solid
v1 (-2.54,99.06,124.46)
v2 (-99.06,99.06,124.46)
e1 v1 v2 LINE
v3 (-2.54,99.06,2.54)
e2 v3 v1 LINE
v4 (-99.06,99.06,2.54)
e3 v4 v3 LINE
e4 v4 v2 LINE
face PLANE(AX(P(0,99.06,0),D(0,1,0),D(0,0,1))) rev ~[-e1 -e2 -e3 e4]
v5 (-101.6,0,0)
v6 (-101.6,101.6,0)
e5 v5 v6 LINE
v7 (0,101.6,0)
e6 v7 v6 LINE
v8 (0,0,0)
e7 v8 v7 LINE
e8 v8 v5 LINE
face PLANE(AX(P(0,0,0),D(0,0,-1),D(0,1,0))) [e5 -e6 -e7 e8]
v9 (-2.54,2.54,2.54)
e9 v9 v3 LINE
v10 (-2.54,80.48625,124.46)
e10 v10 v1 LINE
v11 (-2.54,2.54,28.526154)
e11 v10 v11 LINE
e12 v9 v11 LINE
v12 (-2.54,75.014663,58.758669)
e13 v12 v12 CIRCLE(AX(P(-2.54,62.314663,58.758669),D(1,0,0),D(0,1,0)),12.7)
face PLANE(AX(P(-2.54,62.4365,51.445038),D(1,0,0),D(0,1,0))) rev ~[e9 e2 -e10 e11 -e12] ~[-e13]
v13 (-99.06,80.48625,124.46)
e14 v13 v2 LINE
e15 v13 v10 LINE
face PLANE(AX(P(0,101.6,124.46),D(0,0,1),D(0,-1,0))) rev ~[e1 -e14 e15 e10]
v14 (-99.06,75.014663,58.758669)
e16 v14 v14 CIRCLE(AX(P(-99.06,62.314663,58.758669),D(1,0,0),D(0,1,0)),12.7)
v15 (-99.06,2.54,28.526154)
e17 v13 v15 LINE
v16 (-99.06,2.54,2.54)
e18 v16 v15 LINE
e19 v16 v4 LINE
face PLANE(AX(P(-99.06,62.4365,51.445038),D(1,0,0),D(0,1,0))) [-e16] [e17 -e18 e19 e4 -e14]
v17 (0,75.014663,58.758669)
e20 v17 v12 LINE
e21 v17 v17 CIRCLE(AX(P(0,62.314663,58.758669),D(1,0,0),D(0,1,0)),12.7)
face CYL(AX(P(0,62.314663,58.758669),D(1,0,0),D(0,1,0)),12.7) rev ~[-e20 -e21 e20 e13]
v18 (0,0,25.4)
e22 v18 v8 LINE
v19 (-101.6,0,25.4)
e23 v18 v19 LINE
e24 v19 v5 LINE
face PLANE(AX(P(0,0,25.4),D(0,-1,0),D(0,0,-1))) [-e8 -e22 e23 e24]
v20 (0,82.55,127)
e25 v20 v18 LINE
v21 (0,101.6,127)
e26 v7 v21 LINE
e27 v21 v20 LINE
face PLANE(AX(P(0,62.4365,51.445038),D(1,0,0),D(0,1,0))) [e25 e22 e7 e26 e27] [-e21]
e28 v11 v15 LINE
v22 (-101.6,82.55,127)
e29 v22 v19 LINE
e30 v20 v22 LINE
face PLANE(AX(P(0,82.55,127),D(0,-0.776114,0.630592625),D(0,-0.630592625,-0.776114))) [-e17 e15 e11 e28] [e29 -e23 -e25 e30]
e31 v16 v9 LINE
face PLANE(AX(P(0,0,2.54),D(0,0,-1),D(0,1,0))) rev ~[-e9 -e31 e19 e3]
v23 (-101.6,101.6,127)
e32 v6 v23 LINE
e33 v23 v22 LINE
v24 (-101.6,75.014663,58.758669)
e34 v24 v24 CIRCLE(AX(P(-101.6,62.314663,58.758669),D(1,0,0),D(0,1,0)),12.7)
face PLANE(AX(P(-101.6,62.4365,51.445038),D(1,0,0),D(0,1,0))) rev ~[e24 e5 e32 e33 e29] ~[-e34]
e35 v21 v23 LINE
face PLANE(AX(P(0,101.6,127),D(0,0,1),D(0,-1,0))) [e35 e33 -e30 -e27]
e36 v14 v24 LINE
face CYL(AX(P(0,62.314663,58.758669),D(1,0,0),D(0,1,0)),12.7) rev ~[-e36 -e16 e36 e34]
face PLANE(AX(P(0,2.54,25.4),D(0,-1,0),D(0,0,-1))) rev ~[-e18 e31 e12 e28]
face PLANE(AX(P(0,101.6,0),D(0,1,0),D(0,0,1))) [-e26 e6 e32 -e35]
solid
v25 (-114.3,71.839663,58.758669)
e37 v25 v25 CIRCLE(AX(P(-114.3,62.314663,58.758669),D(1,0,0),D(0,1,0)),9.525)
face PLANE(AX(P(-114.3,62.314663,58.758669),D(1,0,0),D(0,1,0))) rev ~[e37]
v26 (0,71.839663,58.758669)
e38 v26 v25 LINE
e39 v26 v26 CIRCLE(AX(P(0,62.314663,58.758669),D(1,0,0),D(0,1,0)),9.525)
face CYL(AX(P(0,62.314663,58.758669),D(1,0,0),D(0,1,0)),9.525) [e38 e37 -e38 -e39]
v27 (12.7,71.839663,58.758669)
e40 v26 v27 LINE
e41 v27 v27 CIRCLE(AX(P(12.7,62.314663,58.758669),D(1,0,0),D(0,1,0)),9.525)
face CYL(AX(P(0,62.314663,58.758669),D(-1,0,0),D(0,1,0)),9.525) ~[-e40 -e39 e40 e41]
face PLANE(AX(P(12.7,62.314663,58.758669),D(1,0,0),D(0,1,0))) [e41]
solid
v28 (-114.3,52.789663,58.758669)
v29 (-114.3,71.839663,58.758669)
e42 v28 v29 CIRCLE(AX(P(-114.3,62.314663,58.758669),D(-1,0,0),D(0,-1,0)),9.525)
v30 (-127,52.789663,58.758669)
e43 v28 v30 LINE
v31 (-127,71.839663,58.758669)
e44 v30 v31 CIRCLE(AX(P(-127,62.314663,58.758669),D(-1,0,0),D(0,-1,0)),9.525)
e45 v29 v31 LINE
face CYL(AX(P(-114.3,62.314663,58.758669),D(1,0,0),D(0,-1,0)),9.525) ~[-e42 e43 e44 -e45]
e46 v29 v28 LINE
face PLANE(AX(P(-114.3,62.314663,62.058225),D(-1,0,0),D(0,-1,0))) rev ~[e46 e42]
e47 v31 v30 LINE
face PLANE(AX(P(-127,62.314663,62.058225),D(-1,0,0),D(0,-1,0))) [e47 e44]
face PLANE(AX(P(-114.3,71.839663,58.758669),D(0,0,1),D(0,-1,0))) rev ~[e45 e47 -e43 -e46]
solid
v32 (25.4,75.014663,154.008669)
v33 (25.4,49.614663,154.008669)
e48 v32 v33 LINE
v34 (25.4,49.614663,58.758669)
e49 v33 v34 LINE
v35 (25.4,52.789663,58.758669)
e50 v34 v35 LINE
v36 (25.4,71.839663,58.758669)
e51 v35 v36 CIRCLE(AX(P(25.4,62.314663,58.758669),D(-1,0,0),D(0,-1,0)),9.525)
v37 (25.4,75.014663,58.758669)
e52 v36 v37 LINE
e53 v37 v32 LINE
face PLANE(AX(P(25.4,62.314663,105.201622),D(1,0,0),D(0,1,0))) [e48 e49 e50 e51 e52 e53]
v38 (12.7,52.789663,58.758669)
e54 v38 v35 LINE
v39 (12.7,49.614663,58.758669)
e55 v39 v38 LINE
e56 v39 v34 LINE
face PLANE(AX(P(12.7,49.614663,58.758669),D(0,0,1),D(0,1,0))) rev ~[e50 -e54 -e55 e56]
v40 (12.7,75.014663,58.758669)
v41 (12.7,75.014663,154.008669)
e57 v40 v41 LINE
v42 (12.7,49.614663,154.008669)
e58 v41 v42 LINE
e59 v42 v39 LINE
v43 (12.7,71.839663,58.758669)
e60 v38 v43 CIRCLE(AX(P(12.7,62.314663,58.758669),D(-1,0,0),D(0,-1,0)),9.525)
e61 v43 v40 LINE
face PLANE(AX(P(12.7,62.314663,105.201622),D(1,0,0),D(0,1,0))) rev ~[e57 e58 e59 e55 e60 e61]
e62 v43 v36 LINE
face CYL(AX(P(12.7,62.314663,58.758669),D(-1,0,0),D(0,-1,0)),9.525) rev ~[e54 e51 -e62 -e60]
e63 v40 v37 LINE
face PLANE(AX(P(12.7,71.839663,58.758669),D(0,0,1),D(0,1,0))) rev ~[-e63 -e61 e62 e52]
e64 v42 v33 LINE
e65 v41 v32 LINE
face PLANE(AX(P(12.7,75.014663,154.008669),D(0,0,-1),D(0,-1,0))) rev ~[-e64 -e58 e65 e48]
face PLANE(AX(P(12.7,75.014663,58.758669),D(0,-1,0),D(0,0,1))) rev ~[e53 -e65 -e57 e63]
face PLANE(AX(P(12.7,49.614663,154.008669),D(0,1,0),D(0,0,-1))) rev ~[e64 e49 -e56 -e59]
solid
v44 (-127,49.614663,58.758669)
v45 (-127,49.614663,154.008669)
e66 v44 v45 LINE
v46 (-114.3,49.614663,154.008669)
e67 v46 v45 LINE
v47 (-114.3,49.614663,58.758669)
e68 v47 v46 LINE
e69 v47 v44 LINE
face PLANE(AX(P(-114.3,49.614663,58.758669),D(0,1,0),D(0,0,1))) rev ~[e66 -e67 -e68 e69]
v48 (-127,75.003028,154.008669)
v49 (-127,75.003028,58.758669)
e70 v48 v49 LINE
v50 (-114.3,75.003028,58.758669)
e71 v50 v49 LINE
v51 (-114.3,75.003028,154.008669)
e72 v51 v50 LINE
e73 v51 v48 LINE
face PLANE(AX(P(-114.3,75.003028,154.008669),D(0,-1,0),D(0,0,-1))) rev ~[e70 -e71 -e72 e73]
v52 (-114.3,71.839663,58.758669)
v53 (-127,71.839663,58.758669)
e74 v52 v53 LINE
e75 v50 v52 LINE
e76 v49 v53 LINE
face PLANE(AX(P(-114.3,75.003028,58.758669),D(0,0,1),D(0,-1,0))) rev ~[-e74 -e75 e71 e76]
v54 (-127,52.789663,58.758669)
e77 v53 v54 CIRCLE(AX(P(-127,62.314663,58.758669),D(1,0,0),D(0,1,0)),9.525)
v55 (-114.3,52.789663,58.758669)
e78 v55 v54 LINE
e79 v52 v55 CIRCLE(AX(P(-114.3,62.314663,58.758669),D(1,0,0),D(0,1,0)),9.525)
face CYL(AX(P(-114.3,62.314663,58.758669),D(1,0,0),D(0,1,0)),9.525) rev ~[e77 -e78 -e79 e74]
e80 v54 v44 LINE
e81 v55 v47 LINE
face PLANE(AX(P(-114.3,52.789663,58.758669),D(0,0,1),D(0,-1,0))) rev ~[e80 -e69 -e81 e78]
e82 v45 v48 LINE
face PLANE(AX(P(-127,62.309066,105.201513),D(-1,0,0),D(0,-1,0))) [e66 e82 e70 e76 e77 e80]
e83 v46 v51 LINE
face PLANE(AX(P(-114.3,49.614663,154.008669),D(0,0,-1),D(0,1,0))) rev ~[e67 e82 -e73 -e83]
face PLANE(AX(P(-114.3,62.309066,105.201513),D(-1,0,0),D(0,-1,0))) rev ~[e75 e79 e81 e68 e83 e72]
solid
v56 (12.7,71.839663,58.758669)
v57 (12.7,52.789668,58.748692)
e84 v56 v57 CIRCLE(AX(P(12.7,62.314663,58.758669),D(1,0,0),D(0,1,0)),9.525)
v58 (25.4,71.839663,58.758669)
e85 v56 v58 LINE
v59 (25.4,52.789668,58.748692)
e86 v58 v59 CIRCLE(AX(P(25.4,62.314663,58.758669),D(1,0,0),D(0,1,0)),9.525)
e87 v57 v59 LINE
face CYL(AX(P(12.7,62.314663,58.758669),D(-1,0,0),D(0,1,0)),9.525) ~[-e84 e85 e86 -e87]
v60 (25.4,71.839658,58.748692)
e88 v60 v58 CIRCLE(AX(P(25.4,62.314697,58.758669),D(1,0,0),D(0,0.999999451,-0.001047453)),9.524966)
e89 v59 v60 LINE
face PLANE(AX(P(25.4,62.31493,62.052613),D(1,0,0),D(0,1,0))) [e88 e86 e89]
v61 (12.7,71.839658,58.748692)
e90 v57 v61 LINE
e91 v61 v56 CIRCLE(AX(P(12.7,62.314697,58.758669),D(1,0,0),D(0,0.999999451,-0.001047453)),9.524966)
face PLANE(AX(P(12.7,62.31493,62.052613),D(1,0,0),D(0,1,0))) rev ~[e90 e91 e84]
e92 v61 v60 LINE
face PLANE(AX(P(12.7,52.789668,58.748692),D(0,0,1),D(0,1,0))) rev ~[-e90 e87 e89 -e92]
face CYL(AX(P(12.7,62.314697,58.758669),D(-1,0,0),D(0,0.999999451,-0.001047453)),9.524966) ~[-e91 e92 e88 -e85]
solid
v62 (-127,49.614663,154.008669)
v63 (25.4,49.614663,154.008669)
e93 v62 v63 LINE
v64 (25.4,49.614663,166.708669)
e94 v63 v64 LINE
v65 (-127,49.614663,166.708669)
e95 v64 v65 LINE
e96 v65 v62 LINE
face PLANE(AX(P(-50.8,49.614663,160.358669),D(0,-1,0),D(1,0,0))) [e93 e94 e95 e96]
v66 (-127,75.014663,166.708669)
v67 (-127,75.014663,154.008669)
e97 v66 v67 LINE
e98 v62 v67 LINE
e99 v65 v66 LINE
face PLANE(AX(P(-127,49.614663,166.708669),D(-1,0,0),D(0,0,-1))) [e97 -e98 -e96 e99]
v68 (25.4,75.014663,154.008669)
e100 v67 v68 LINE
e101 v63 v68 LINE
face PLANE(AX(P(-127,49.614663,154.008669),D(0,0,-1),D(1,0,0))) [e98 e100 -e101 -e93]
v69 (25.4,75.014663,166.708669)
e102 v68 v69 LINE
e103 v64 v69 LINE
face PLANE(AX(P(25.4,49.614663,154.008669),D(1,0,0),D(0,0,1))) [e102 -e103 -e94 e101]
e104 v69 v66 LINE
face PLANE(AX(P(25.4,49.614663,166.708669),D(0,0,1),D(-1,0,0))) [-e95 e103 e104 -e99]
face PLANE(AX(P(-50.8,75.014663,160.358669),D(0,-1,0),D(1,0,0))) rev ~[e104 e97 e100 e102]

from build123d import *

# Parameters (mm, degrees)
F1_DEPTH  = 101.6
F2_T      = -2.54
F3_R      = 12.7
F4_DEPTH  = 101.6
F5_R      = 9.525
F6_DEPTH  = 114.3
F7_DEPTH  = 12.7
F9_DEPTH  = 12.7
F11_DEPTH = 12.7
F13_DEPTH = 12.7
F15_DEPTH = 12.7
F17_DEPTH = 25.4


with BuildPart() as f1:
    # F0 (on Right) → F1 (new body)
    with BuildSketch(Plane.YZ):
        Polygon((0, 25.4), (0, 0), (101.6, 0), (101.6, 127), (82.55, 127), align=None)
    extrude(amount=-F1_DEPTH)

    # F2
    f2_openings = [f1.faces().sort_by_distance(p)[0] for p in [
        (-50.8, 41.275, 76.2),
    ]]
    offset(amount=F2_T, openings=f2_openings)

    # F3 (on face) → F4 (cut)
    with BuildSketch(Plane.YZ):
        with Locations((62.3146630824, 58.7586686015)):
            Circle(F3_R)
    extrude(amount=-F4_DEPTH, mode=Mode.SUBTRACT)


with BuildPart() as f6:
    # F5 (on face) → F6 (new body)
    with BuildSketch(Plane.YZ):
        with Locations((62.3146630824, 58.7586686015)):
            Circle(F5_R)
    extrude(amount=-F6_DEPTH)

    # F7 (add): a face of the model
    f7_faces = [f6.faces().sort_by_distance(p)[0] for p in [
        (0, 62.3146630824, 58.7586686015),
    ]]
    extrude(f7_faces, amount=F7_DEPTH)


with BuildPart() as f9:
    # F8 (on face) → F9 (new body)
    with BuildSketch(Plane.YZ.offset(12.7)):
        with BuildLine():
            ThreePointArc((52.7896630824, 58.7586686015), (62.3146630824, 68.2836686015), (71.8396630824, 58.7586686015))
            Line((71.8396630824, 58.7586686015), (75.0146630824, 58.7586686015))
            Line((75.0146630824, 58.7586686015), (75.0146630824, 154.0086686015))
            Line((75.0146630824, 154.0086686015), (49.6146630824, 154.0086686015))
            Line((49.6146630824, 154.0086686015), (49.6146630824, 58.7586686015))
            Line((49.6146630824, 58.7586686015), (52.7896630824, 58.7586686015))
        make_face()
    extrude(amount=F9_DEPTH)


with BuildPart() as f11:
    # F10 (on face) → F11 (new body)
    with BuildSketch(Plane.YZ.offset(12.7)):
        with BuildLine():
            ThreePointArc((71.8396630824, 58.7586686015), (62.3096746028, 68.2836672952), (52.7896683075, 58.7486916438))
            Line((52.7896683075, 58.7486916438), (71.8396578572, 58.7486916438))
            ThreePointArc((71.8396578572, 58.7486916438), (71.8396617761, 58.7536801219), (71.8396630824, 58.7586686015))
        make_face()
    extrude(amount=F11_DEPTH)


with BuildPart() as f13:
    # F12 (on face) → F13 (new body)
    with BuildSketch(Plane(origin=(-114.3, 0, 0), x_dir=(0, -1, 0), z_dir=(-1, 0, 0))):
        with BuildLine():
            ThreePointArc((-71.8396630824, 58.7586686015), (-62.3146630824, 68.2836686015), (-52.7896630824, 58.7586686015))
            Line((-52.7896630824, 58.7586686015), (-49.6146630824, 58.7586686015))
            Line((-49.6146630824, 58.7586686015), (-49.6146630824, 154.0086686015))
            Line((-49.6146630824, 154.0086686015), (-75.003027916, 154.0086686015))
            Line((-75.003027916, 154.0086686015), (-75.003027916, 58.7586686015))
            Line((-75.003027916, 58.7586686015), (-71.8396630824, 58.7586686015))
        make_face()
    extrude(amount=F13_DEPTH)


with BuildPart() as f15:
    # F14 (on face) → F15 (new body)
    with BuildSketch(Plane(origin=(-114.3, 0, 0), x_dir=(0, -1, 0), z_dir=(-1, 0, 0))):
        with BuildLine():
            Line((-71.8396630824, 58.7586686015), (-62.3146630824, 58.7586686015))
            Line((-62.3146630824, 58.7586686015), (-52.7896630824, 58.7586686015))
            ThreePointArc((-52.7896630824, 58.7586686015), (-62.3146630824, 68.2836686015), (-71.8396630824, 58.7586686015))
        make_face()
    extrude(amount=F15_DEPTH)


with BuildPart() as f17:
    # F16 (on face) → F17 (new body)
    with BuildSketch(Plane.XZ.offset(-49.6146630824)):
        Polygon((-127, 166.7086686015), (-127, 154.0086686015), (-114.3, 154.0086686015), (25.4, 154.0086686015), (25.4, 166.7086686015), align=None)
    extrude(amount=-F17_DEPTH)


solid = Compound([f1.part, f6.part, f9.part, f11.part, f13.part, f15.part, f17.part])
